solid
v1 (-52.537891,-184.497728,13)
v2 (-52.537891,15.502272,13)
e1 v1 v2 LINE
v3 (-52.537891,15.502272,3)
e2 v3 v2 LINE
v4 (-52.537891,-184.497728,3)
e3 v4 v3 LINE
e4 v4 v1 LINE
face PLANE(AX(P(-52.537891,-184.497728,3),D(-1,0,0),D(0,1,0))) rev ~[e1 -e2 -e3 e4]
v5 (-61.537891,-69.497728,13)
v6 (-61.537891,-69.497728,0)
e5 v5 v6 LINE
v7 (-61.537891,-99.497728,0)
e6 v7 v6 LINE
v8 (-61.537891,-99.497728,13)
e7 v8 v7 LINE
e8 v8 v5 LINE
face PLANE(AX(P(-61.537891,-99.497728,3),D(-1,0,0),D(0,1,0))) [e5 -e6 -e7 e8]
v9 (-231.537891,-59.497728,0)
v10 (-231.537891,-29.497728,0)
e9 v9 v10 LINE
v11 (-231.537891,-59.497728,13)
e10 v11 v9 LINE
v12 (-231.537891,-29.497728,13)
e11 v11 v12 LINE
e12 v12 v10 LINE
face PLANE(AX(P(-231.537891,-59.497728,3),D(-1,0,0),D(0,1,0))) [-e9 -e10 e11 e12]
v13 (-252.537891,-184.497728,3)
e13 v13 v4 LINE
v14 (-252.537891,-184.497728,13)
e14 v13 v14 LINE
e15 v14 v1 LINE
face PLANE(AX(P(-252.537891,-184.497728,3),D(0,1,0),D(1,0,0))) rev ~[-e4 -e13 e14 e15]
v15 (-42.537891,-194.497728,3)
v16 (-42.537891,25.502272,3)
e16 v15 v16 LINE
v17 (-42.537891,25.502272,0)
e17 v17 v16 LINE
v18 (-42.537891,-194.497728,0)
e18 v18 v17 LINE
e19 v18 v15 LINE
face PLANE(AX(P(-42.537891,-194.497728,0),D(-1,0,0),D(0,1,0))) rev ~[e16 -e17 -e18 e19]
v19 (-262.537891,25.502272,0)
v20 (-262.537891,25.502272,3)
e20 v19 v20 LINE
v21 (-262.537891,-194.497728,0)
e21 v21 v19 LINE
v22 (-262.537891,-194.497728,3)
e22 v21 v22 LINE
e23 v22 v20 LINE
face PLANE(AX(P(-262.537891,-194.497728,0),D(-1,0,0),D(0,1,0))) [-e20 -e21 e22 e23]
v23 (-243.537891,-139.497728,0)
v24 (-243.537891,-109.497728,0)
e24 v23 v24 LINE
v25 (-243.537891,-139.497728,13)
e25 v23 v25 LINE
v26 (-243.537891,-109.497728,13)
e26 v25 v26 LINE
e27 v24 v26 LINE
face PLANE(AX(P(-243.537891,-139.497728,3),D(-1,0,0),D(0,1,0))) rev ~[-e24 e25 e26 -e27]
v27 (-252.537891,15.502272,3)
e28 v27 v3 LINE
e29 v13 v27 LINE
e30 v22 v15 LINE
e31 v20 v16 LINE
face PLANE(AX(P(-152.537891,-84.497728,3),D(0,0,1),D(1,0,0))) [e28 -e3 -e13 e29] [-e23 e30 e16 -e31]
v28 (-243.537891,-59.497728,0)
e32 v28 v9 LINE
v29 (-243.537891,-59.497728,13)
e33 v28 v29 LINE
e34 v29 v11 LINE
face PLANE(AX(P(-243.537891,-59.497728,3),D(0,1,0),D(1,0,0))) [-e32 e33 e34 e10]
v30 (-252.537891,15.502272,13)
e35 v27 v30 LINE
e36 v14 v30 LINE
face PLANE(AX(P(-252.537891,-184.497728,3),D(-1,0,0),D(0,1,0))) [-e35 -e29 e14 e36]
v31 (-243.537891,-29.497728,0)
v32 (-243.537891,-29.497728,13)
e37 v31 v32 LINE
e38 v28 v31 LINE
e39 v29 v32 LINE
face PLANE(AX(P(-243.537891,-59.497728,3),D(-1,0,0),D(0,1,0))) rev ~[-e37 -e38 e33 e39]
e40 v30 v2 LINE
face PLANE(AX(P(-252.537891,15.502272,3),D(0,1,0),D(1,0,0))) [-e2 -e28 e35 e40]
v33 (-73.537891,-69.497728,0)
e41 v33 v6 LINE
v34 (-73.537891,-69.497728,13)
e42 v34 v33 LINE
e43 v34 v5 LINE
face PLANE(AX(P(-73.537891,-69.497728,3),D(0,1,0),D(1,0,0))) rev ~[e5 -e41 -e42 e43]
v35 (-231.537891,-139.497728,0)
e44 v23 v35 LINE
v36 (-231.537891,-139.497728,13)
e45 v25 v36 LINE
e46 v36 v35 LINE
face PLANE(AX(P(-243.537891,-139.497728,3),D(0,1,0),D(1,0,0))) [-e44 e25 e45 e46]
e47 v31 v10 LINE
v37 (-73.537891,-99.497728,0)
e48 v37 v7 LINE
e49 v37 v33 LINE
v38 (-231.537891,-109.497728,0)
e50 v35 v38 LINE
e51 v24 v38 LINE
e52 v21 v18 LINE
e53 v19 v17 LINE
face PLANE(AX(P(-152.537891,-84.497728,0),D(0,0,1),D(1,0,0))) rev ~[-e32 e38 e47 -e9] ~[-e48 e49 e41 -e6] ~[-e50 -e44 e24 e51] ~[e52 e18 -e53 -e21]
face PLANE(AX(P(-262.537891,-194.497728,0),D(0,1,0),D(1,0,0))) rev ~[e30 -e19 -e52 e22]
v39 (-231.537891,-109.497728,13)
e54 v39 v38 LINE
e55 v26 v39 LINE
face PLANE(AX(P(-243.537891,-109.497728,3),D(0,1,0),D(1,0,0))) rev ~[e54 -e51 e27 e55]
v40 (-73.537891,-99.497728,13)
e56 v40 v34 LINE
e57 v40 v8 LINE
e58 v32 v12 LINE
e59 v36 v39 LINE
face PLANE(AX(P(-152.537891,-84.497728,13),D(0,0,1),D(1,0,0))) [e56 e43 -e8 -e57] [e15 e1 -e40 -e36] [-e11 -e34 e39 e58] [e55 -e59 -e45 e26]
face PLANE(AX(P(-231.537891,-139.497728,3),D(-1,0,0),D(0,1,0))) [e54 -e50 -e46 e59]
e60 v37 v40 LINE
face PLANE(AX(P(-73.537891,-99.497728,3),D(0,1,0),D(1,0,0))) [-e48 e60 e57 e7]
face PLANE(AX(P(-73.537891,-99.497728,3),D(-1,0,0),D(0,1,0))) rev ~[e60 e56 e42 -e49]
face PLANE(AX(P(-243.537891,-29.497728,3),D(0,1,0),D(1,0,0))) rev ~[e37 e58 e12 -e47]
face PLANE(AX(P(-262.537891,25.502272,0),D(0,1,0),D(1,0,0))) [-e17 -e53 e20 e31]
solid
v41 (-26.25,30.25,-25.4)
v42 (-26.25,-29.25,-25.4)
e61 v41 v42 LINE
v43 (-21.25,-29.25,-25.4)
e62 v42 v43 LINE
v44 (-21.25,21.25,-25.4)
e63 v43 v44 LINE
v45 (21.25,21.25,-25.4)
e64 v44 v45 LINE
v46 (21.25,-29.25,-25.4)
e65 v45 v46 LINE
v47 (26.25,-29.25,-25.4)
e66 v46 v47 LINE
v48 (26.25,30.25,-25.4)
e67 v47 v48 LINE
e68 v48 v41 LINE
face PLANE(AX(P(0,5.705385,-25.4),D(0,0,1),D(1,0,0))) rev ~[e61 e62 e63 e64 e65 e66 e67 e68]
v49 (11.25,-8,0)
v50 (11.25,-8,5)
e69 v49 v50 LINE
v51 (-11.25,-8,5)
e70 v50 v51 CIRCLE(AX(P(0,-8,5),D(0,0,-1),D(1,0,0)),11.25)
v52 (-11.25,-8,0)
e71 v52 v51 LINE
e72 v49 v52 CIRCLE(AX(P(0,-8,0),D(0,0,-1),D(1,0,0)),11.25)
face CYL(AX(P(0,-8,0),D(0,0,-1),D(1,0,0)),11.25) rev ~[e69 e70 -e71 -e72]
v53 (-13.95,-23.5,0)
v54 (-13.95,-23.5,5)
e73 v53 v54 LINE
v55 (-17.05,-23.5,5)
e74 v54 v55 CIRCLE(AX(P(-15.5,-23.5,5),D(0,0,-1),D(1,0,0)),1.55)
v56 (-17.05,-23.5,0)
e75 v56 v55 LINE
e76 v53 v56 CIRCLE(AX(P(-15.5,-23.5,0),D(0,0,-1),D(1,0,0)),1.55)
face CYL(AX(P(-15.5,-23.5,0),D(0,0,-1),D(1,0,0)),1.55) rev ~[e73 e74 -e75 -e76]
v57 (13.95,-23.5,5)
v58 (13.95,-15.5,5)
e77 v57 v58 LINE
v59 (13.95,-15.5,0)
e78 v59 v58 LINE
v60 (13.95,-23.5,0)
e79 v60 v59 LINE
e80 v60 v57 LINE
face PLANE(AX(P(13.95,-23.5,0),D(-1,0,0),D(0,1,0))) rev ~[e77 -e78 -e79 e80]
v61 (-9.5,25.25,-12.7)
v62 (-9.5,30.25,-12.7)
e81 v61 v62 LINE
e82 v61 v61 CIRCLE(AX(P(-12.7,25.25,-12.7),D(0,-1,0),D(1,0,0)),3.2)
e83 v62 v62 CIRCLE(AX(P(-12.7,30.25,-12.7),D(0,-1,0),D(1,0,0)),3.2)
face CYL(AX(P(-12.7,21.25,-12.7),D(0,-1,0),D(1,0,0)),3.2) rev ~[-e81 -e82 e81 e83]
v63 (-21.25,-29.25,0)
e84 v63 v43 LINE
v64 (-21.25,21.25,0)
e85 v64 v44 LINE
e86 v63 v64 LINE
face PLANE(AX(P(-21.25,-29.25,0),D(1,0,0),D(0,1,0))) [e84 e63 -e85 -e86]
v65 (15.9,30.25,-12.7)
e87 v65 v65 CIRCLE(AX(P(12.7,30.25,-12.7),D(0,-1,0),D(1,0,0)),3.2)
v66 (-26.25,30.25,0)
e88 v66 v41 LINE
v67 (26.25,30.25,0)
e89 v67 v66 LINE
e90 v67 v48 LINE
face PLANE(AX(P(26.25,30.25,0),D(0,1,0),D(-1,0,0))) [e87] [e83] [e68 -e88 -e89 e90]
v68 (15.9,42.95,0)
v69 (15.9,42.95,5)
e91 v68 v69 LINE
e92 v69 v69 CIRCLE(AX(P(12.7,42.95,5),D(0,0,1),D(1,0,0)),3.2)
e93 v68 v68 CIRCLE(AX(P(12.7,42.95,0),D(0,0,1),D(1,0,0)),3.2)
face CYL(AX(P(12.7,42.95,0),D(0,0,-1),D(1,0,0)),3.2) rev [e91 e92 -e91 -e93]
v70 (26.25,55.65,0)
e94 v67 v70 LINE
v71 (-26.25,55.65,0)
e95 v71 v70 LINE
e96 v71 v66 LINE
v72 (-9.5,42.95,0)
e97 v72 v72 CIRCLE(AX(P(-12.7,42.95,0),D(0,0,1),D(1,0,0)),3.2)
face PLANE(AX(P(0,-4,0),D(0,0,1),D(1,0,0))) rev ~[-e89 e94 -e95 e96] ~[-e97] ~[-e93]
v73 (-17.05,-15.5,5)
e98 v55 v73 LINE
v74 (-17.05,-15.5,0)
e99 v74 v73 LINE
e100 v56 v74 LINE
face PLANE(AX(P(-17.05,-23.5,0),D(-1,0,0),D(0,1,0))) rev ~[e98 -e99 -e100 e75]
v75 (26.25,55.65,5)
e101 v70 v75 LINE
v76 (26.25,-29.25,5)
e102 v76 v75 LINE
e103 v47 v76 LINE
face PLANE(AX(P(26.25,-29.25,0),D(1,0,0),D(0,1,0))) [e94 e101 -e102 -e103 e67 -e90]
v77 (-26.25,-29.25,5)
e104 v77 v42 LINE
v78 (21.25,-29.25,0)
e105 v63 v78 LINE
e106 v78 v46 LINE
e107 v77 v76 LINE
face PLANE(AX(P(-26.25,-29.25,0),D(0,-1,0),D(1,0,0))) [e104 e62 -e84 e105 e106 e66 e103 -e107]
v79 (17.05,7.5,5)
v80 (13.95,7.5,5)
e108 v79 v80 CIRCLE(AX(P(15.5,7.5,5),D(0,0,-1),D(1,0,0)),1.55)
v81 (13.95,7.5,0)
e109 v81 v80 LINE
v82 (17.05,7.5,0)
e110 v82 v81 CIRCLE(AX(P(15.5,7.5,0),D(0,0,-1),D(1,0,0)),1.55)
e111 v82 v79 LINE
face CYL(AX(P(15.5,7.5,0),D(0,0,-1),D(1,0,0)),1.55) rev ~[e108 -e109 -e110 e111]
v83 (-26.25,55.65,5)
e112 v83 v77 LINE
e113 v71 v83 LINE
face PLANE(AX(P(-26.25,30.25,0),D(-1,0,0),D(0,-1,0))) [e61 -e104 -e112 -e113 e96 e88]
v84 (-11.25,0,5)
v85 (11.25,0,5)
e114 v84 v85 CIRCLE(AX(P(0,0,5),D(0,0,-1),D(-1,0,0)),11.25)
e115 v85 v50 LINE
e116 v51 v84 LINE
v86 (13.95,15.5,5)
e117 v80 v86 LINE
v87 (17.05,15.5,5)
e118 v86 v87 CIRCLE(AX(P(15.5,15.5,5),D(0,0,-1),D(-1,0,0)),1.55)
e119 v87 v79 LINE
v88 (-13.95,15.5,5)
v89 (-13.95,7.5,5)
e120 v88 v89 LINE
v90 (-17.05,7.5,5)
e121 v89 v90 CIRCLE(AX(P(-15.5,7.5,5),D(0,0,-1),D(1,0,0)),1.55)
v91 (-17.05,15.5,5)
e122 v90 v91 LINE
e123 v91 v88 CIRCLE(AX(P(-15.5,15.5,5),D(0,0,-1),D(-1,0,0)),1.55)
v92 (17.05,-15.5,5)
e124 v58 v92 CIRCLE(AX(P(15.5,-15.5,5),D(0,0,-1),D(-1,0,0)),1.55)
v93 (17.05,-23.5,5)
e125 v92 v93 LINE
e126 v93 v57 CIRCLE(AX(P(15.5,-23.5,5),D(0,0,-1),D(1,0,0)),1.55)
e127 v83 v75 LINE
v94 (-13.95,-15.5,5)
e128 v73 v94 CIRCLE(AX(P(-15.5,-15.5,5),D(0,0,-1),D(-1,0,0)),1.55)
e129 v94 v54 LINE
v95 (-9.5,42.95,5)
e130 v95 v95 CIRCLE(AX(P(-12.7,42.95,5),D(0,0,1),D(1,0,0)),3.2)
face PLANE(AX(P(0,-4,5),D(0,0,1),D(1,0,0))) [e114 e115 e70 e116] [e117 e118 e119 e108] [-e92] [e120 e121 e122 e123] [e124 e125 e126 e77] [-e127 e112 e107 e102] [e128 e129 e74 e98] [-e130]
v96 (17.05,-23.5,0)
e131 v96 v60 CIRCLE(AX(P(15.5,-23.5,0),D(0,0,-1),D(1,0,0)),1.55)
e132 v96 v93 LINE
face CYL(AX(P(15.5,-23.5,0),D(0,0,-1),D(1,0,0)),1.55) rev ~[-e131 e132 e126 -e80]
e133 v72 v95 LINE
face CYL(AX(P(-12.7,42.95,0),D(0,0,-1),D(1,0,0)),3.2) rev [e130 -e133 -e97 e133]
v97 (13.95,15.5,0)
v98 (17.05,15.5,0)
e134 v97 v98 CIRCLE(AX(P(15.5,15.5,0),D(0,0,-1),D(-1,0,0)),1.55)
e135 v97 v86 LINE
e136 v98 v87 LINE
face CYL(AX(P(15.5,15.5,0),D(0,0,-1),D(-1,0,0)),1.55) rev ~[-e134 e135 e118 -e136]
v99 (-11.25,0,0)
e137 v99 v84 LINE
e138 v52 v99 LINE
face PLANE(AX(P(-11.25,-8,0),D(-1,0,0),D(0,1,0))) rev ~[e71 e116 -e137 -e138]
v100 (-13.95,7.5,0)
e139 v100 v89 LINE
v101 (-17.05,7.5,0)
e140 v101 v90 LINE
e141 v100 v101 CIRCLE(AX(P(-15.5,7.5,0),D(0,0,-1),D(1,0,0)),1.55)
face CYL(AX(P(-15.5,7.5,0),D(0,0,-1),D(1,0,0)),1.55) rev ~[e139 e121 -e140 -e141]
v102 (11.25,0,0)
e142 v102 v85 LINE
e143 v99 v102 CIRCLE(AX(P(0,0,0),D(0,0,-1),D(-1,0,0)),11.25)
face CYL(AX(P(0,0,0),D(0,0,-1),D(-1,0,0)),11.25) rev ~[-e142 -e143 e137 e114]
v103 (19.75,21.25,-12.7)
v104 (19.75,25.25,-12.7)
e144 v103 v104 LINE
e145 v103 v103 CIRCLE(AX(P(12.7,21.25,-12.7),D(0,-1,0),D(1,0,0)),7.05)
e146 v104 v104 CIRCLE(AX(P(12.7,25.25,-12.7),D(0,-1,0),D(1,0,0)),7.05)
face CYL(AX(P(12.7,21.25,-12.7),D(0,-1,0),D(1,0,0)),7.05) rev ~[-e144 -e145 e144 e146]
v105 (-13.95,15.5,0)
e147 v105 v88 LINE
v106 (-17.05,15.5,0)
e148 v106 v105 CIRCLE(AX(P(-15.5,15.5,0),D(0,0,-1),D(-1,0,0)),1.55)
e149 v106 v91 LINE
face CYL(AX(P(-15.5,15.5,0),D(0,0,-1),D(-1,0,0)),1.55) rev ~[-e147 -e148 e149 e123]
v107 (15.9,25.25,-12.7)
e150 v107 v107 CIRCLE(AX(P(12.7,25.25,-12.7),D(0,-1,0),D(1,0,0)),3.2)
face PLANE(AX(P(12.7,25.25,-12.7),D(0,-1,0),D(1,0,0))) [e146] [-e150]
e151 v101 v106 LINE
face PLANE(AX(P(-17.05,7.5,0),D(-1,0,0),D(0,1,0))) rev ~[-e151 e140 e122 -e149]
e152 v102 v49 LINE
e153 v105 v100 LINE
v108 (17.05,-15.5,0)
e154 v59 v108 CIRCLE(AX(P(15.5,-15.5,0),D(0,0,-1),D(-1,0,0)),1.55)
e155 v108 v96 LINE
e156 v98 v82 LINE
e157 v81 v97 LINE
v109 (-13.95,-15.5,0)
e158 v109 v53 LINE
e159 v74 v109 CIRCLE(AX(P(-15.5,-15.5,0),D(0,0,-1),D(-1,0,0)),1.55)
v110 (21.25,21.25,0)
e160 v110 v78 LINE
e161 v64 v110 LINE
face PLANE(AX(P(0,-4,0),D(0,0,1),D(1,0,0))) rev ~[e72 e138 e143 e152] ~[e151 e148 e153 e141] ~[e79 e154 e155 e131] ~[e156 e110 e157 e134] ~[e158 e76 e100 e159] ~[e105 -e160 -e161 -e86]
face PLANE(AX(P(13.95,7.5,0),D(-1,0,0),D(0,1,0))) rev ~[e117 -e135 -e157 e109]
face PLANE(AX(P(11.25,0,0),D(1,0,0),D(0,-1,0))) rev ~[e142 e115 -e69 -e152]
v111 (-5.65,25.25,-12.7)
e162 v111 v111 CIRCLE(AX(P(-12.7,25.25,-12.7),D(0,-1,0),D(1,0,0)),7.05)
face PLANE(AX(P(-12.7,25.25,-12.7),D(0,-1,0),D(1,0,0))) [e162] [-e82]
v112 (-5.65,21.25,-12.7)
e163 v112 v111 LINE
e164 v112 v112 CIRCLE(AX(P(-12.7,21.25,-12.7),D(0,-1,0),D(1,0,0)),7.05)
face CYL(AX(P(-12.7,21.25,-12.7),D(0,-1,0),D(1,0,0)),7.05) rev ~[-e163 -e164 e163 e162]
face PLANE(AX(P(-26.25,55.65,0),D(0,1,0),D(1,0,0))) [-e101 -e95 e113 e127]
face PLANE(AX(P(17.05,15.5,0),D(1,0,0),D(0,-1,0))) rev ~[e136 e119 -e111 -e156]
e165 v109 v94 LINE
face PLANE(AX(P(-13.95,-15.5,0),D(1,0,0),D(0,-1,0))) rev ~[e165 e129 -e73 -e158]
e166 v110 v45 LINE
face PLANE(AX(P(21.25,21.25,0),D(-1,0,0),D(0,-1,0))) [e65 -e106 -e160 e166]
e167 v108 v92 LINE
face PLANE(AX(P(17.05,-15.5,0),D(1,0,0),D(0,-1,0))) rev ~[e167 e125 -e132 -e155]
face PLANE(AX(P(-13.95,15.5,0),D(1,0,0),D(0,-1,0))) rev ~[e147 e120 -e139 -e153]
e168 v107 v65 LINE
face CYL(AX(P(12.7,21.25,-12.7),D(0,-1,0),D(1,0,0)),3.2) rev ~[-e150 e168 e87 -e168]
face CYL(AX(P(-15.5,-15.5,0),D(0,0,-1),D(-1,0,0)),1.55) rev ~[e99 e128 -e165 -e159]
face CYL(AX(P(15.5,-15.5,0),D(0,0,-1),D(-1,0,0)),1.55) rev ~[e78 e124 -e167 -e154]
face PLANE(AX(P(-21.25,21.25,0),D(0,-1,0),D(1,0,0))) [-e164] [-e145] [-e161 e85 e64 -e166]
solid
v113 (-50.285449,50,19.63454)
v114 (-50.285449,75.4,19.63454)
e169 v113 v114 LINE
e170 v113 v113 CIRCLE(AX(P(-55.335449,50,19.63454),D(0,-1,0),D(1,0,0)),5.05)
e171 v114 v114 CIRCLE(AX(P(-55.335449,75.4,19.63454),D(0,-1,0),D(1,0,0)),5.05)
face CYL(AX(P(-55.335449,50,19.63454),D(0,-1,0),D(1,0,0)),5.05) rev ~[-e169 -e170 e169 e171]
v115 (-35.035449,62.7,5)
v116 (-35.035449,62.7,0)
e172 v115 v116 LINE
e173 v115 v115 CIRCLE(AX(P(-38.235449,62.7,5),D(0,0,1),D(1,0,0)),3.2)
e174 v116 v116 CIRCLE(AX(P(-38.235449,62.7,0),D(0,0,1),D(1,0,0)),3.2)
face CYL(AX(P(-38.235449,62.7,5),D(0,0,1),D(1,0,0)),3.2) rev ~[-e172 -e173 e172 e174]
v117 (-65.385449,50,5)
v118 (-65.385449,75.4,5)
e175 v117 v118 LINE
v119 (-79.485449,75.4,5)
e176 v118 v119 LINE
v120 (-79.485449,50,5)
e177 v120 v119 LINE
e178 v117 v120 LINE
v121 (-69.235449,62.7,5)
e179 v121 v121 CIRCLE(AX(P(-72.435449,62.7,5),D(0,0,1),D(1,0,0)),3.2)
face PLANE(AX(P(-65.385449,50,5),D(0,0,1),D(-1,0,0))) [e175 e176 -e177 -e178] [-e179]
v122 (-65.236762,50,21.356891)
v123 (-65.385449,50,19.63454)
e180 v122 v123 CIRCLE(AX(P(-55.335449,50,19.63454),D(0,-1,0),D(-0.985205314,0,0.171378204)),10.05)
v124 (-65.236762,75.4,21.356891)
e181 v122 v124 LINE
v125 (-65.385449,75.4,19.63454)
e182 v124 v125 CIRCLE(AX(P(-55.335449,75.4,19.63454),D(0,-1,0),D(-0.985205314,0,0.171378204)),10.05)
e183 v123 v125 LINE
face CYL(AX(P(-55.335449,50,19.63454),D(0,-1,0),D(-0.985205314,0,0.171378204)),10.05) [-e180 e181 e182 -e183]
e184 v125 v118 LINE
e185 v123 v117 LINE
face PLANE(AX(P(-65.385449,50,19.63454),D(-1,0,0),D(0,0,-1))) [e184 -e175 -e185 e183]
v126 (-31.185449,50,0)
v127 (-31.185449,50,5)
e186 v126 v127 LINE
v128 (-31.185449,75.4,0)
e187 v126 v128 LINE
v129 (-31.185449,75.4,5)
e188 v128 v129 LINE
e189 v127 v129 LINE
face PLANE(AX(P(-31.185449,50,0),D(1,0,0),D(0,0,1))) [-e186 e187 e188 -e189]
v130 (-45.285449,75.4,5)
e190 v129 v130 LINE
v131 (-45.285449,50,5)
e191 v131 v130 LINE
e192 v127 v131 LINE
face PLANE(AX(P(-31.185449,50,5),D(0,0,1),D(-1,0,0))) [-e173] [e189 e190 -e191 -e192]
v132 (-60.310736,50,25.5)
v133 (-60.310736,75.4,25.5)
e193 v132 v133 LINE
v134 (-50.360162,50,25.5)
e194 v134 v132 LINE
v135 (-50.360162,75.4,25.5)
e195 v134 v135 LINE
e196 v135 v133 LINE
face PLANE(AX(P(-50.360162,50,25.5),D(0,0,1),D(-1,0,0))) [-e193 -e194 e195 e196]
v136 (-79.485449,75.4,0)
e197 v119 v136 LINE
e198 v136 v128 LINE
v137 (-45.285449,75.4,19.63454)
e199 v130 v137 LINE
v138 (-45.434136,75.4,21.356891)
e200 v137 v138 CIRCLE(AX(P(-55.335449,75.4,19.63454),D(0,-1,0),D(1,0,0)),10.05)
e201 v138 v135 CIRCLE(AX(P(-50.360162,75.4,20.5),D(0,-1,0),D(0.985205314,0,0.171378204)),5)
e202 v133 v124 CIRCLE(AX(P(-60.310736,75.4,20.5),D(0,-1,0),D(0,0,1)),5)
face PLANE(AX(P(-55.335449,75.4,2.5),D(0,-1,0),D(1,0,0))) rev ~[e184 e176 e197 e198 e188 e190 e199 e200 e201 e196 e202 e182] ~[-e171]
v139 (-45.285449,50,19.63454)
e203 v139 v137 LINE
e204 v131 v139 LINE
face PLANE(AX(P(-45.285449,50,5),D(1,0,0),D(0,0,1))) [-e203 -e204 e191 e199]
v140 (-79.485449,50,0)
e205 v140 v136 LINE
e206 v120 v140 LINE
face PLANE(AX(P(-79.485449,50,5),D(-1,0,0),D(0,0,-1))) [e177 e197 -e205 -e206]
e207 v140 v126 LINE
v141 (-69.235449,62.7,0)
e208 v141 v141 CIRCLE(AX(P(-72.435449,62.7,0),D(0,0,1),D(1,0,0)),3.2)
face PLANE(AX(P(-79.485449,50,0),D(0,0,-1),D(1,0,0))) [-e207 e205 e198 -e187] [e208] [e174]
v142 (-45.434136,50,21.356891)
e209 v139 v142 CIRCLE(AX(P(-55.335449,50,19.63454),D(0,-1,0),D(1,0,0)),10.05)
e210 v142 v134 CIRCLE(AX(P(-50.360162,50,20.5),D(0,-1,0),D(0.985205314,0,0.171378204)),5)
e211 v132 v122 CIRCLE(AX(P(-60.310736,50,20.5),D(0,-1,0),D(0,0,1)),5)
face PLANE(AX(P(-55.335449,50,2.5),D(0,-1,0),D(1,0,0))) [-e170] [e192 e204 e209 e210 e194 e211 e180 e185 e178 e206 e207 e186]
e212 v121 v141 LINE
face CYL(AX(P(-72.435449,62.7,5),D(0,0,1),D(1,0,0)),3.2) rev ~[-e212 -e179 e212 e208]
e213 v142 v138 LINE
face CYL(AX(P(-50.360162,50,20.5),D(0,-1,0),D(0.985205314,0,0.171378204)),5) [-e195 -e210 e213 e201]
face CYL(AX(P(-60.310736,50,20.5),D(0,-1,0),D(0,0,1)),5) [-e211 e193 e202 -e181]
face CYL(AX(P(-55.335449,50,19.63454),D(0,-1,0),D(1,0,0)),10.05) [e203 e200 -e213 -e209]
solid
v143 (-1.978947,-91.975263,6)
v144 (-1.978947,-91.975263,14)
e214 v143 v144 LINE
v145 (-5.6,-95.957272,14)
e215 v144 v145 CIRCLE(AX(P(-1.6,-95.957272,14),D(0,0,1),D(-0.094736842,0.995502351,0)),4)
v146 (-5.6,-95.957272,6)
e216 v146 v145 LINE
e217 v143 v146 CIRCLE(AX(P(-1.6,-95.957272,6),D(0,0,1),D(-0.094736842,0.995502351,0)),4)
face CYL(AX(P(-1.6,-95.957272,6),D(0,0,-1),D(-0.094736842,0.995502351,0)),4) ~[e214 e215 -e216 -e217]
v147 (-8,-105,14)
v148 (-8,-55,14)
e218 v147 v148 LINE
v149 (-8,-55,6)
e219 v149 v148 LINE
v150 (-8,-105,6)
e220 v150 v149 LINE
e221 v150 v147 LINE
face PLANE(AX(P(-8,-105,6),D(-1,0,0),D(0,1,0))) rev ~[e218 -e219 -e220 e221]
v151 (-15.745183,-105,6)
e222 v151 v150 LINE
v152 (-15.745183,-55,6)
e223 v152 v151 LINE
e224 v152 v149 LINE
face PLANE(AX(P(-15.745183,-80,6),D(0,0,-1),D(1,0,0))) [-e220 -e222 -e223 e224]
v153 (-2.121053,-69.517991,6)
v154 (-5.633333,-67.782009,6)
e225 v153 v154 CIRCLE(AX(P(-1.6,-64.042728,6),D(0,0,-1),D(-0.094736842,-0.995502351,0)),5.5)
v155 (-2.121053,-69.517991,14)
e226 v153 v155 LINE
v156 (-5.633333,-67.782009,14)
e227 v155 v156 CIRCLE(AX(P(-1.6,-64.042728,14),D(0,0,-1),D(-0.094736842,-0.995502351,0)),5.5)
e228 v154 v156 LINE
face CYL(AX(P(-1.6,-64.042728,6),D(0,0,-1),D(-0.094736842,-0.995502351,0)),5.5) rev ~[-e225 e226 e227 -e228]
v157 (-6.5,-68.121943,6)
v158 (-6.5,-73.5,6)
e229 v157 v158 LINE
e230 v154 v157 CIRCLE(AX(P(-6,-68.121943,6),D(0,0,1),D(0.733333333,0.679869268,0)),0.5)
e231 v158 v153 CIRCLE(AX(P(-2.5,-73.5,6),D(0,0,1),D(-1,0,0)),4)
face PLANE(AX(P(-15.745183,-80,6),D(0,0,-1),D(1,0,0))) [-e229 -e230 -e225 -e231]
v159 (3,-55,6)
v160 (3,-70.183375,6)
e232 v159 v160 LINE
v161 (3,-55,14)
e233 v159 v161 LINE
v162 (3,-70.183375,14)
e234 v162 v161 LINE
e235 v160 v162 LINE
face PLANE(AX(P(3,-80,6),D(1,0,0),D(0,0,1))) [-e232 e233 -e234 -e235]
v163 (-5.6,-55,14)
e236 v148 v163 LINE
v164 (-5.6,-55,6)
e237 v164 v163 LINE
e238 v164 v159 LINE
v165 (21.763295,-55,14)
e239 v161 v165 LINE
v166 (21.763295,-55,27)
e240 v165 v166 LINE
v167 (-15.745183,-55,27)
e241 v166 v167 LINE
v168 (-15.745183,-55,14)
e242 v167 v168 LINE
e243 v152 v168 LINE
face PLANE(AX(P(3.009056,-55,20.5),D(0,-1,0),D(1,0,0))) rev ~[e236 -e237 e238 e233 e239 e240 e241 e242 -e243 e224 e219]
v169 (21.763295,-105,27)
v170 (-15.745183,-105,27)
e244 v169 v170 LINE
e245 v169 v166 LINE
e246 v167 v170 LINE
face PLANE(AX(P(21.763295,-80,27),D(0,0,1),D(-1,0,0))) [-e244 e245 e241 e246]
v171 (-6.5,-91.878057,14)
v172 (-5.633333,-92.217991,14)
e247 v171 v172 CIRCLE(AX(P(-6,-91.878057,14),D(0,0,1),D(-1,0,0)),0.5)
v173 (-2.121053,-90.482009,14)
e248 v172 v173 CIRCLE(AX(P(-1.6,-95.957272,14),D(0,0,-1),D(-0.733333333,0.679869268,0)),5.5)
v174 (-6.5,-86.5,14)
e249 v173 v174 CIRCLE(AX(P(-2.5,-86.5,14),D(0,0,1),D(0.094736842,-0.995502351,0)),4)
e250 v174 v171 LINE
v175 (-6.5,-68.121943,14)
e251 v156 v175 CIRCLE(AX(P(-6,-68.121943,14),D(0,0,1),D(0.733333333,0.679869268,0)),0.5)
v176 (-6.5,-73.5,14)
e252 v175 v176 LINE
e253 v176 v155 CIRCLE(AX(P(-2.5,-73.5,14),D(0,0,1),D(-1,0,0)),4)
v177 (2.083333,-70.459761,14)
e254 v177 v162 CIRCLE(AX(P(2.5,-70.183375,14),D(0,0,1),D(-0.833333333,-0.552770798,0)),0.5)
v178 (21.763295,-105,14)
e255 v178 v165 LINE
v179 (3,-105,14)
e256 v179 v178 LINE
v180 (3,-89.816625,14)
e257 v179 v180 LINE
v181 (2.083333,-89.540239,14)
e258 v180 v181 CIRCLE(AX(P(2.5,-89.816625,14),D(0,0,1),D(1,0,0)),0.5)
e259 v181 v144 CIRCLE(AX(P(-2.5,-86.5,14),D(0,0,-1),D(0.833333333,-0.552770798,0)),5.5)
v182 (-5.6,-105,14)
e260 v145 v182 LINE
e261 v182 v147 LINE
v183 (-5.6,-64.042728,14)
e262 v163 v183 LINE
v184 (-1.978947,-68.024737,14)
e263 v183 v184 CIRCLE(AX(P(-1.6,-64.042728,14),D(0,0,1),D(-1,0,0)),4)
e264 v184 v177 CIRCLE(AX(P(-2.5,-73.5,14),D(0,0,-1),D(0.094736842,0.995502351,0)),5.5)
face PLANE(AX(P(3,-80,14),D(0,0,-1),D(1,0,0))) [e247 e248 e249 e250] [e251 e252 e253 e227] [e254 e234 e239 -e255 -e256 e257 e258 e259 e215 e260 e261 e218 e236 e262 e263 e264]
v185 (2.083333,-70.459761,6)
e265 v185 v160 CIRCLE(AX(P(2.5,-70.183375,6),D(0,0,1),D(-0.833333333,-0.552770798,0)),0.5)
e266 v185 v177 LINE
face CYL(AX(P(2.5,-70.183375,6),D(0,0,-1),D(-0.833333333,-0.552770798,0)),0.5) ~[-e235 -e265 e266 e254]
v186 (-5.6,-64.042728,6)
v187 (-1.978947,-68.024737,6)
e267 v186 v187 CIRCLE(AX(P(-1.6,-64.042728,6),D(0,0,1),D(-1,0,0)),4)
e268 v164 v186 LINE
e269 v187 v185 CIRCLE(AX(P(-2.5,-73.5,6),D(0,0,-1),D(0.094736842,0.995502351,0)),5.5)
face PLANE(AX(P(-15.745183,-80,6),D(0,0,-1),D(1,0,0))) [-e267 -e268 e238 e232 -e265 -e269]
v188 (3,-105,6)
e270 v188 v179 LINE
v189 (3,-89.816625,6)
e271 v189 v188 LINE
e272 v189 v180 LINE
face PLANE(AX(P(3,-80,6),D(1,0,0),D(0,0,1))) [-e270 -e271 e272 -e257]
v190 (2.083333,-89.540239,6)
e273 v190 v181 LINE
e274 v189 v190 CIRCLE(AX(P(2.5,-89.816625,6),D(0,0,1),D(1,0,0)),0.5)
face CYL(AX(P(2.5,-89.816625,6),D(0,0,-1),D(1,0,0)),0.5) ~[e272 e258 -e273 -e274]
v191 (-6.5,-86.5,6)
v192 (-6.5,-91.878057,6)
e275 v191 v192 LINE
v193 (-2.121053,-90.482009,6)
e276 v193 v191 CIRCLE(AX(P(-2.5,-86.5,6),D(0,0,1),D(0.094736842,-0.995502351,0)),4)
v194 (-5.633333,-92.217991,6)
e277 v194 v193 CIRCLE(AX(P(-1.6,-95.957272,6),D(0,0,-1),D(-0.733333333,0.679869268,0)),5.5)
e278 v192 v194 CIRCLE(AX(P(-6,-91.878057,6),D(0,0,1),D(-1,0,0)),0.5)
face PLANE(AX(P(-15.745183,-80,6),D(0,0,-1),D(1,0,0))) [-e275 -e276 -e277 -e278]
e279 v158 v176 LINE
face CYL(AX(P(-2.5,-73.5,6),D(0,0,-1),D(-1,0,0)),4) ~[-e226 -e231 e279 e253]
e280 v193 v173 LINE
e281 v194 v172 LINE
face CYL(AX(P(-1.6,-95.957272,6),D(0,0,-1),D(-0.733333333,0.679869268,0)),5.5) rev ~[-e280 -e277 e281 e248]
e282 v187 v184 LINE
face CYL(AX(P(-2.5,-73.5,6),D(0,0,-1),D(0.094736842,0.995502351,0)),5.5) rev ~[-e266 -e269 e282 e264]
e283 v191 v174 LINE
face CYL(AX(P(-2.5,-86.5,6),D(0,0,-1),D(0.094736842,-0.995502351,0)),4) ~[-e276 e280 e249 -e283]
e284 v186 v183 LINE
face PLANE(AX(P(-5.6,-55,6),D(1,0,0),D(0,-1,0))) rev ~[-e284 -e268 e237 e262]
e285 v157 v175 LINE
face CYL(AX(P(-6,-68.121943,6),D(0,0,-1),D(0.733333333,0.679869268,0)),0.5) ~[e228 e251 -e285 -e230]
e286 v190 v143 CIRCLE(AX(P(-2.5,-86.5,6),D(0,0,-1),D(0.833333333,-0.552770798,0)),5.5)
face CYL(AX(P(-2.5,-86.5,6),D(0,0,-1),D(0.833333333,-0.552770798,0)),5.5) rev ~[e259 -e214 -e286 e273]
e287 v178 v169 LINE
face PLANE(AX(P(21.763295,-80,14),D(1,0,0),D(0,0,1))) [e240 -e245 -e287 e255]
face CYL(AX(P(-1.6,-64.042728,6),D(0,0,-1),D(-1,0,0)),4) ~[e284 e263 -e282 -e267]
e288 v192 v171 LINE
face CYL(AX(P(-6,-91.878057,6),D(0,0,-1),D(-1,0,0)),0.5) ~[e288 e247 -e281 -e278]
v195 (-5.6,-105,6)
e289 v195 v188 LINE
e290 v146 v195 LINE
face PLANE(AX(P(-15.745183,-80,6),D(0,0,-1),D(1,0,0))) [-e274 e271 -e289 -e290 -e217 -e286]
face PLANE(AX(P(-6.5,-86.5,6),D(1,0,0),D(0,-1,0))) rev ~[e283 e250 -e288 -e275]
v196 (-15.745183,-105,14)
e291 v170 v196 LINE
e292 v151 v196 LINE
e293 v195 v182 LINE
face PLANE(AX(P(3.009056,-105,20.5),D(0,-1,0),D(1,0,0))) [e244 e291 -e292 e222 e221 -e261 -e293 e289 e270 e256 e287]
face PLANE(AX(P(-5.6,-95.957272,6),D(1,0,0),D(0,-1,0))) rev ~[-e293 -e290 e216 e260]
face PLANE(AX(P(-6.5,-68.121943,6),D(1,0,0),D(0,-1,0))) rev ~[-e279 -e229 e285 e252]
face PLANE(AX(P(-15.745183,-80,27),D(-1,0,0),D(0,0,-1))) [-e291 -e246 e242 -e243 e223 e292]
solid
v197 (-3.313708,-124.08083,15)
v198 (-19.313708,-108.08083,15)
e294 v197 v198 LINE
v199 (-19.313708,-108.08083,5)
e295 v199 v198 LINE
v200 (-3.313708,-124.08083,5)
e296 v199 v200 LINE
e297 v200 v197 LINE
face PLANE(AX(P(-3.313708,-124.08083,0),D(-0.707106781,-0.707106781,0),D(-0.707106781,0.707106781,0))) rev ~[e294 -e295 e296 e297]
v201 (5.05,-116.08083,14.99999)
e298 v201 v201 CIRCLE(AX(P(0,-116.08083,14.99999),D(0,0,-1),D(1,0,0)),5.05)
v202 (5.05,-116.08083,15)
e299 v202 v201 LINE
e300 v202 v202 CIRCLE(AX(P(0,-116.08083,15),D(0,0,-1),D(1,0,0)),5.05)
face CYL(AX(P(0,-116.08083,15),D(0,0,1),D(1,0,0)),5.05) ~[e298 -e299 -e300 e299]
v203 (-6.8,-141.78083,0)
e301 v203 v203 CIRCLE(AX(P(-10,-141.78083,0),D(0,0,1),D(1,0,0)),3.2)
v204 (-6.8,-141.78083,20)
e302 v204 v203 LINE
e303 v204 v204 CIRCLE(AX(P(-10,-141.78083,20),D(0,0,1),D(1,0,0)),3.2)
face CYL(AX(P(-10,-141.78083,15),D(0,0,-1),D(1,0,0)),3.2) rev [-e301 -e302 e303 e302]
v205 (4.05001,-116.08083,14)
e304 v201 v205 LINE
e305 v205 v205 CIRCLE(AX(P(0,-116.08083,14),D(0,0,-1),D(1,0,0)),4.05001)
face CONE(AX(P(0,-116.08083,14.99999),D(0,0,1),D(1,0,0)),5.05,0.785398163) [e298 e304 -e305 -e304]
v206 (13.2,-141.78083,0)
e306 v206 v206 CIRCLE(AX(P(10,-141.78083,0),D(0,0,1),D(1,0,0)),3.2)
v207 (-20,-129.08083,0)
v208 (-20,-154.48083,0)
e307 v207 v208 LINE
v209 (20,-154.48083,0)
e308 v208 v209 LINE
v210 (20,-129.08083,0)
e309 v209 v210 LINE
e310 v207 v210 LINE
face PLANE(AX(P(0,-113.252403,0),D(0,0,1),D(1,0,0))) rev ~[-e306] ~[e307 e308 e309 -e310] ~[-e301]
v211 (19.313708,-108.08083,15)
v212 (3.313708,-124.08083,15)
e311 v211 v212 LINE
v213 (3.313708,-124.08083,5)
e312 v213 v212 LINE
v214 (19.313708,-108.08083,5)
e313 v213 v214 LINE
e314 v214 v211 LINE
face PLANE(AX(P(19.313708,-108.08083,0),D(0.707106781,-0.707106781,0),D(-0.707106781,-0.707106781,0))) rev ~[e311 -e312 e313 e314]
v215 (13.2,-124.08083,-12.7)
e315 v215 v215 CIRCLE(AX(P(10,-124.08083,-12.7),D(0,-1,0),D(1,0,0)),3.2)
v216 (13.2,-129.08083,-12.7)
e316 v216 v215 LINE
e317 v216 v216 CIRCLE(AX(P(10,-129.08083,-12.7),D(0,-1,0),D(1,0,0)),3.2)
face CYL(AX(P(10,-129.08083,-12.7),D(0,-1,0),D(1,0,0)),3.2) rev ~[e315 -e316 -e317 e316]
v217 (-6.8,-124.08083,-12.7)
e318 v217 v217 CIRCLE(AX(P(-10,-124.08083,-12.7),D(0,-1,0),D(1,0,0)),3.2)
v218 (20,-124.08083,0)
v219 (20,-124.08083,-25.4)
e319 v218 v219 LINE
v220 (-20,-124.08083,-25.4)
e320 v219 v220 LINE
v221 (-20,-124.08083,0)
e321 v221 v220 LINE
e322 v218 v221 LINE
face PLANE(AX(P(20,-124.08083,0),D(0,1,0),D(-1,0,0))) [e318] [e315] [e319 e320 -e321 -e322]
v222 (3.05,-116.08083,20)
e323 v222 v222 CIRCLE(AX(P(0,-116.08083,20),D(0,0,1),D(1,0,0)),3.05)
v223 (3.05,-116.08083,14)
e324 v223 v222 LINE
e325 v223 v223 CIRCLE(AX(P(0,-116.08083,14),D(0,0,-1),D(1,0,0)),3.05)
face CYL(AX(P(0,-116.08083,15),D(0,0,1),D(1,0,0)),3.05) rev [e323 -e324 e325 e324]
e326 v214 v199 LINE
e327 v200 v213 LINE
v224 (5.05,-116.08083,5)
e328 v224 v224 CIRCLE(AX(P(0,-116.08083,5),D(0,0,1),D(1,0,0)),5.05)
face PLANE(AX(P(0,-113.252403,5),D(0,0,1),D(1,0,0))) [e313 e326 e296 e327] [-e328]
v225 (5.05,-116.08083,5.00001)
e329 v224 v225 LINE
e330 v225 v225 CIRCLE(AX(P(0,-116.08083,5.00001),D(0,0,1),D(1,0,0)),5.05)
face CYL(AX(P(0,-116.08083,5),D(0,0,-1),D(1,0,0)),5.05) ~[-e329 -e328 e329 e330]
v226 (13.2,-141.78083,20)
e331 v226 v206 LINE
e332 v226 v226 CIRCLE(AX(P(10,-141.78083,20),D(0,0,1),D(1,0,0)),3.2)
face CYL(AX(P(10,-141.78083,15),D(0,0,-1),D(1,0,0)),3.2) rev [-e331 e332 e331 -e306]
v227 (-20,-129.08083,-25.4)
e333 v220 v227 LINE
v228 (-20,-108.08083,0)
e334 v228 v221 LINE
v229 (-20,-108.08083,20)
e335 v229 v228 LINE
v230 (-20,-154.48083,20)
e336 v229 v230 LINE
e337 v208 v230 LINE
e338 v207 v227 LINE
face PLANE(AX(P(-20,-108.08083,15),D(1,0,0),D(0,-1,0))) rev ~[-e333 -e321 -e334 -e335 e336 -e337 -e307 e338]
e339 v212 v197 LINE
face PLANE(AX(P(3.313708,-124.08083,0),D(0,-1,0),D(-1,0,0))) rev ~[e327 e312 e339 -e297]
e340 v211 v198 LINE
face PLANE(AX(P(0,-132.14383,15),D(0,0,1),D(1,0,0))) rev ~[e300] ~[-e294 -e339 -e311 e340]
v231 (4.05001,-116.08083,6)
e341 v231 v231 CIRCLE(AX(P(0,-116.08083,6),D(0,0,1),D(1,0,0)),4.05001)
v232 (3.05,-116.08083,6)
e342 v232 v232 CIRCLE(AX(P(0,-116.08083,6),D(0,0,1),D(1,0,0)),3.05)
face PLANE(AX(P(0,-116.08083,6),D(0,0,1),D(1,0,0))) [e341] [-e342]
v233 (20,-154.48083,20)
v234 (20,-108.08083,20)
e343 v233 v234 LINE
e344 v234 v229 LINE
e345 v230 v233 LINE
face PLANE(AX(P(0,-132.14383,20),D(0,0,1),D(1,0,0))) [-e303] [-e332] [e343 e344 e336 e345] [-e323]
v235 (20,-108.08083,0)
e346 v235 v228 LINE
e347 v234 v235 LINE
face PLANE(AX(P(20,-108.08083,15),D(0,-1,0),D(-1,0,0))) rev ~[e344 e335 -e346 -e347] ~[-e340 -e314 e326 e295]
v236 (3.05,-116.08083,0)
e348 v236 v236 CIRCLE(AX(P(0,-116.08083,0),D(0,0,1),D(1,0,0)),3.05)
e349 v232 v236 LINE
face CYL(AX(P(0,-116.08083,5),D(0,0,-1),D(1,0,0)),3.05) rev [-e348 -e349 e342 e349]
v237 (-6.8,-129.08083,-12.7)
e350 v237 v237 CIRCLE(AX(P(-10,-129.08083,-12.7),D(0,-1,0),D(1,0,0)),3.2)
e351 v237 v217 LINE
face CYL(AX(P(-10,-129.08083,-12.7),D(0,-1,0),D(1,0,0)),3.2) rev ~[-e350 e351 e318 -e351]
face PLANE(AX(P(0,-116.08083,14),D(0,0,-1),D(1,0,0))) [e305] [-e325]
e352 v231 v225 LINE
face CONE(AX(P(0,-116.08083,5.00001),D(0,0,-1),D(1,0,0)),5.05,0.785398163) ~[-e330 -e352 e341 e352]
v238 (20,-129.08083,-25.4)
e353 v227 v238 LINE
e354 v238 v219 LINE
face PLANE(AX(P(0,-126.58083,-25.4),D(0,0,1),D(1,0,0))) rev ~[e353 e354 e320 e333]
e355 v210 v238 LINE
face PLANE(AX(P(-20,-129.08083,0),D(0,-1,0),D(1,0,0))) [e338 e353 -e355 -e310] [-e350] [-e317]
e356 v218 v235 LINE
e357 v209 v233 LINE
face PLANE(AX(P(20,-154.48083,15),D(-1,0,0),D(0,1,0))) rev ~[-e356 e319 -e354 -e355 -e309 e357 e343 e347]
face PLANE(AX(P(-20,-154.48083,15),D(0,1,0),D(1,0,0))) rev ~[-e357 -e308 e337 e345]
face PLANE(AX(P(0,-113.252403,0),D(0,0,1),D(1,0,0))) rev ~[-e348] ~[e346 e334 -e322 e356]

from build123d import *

# Parameters (mm, degrees)
F2_R      = 5.05
F3_DEPTH  = 25.4
F4_R      = 3.2
F5_DEPTH  = 5
F6_W      = 42.5
F6_H      = 50.5
F6_W_2    = 52.5
F6_H_2    = 25.4
F6_R      = 3.2
F7_DEPTH  = 5
F8_DEPTH  = 25.4
F9_R      = 3.2
F10_DEPTH = 9
F9_R_2    = 7.05
F11_DEPTH = 4
F12_W     = 40
F12_H     = 25.4
F12_R     = 3.2
F13_DEPTH = 15
F12_R_2   = 3.05
F14_DEPTH = 5
F15_R     = 3.2
F15_R_2   = 3.05
F16_DEPTH = 5
F17_DEPTH = 25.4
F18_R     = 3.2
F19_DEPTH = 5
F20_R     = 5.05
F20_R_2   = 3.05
F22_DEPTH = 1
F21_R     = 5.05
F21_R_2   = 3.05
F23_DEPTH = 1
F24_SIZE  = 0.99999
F26_W     = 18.7451829227
F26_H     = 8
F27_DEPTH = 25
F29_DEPTH = 8
F30_W     = 220
F30_H     = 220
F30_W_2   = 12
F30_H_2   = 30
F31_DEPTH = 3
F34_W     = 200
F34_H     = 200
F34_W_2   = 12
F34_H_2   = 30
F35_DEPTH = 10


# Not quite as in the source:
# - a fillet or chamfer is up to 0.001 mm smaller than in the source, because OpenCascade refuses the exact size
# - a feature names something its author has since deleted; it is built from what else it names


with BuildPart() as f3:
    # F2 (on offset) → F3 (new body)
    with BuildSketch(Plane.XZ.offset(-50)):
        Polygon((-65.3854490548, 5), (-79.4854490548, 5), (-79.4854490548, 0), (-31.1854490548, 0), (-31.1854490548, 5), (-45.2854490548, 5), align=None)
        with BuildLine():
            Line((-65.3854490548, 19.6345400687), (-65.3854490548, 5))
            Line((-65.3854490548, 5), (-45.2854490548, 5))
            Line((-45.2854490548, 5), (-45.2854490548, 19.6345400687))
            ThreePointArc((-45.2854490548, 19.6345400687), (-55.3354490548, 9.5845400687), (-65.3854490548, 19.6345400687))
        make_face()
        with BuildLine():
            ThreePointArc((-65.2367624625, 21.3568910211), (-65.3482084085, 20.4989185312), (-65.3854490548, 19.6345400687))
            ThreePointArc((-65.3854490548, 19.6345400687), (-55.3354490548, 9.5845400687), (-45.2854490548, 19.6345400687))
            ThreePointArc((-45.2854490548, 19.6345400687), (-45.3226897012, 20.4989185312), (-45.4341356472, 21.3568910211))
            ThreePointArc((-45.4341356472, 21.3568910211), (-47.1418128824, 24.326516373), (-50.3601622182, 25.5))
            Line((-50.3601622182, 25.5), (-60.3107358915, 25.5))
            ThreePointArc((-60.3107358915, 25.5), (-63.5290852273, 24.326516373), (-65.2367624625, 21.3568910211))
        make_face()
        with Locations((-55.3354490548, 19.6345400687)):
            Circle(F2_R, mode=Mode.SUBTRACT)
    extrude(amount=-F3_DEPTH)

    # F4 (on face) → F5 (cut, through all)
    with BuildSketch(Plane.XY.offset(5)):
        with Locations((-72.4354490548, 62.7)):
            Circle(F4_R)
        with Locations((-38.2354490548, 62.7)):
            Circle(F4_R)
    extrude(amount=-F5_DEPTH, mode=Mode.SUBTRACT)


with BuildPart() as f7:
    # F6 (on Top) → F7 (new body)
    with BuildSketch(Plane.XY):
        with Locations((0, -4)):
            Rectangle(F6_W, F6_H)
        with BuildLine():
            Line((-17.05, -23.5), (-17.05, -15.5))
            ThreePointArc((-17.05, -15.5), (-15.5, -13.95), (-13.95, -15.5))
            Line((-13.95, -15.5), (-13.95, -23.5))
            ThreePointArc((-13.95, -23.5), (-15.5, -25.05), (-17.05, -23.5))
        make_face(mode=Mode.SUBTRACT)
        with BuildLine():
            Line((-17.05, 7.5), (-17.05, 15.5))
            ThreePointArc((-17.05, 15.5), (-15.5, 17.05), (-13.95, 15.5))
            Line((-13.95, 15.5), (-13.95, 7.5))
            ThreePointArc((-13.95, 7.5), (-15.5, 5.95), (-17.05, 7.5))
        make_face(mode=Mode.SUBTRACT)
        with BuildLine():
            Line((13.95, -23.5), (13.95, -15.5))
            ThreePointArc((13.95, -15.5), (15.5, -13.95), (17.05, -15.5))
            Line((17.05, -15.5), (17.05, -23.5))
            ThreePointArc((17.05, -23.5), (15.5, -25.05), (13.95, -23.5))
        make_face(mode=Mode.SUBTRACT)
        with BuildLine():
            Line((-11.25, -8), (-11.25, 0))
            ThreePointArc((-11.25, 0), (0, 11.25), (11.25, 0))
            Line((11.25, 0), (11.25, -8))
            ThreePointArc((11.25, -8), (0, -19.25), (-11.25, -8))
        make_face(mode=Mode.SUBTRACT)
        with BuildLine():
            Line((13.95, 7.5), (13.95, 15.5))
            ThreePointArc((13.95, 15.5), (15.5, 17.05), (17.05, 15.5))
            Line((17.05, 15.5), (17.05, 7.5))
            ThreePointArc((17.05, 7.5), (15.5, 5.95), (13.95, 7.5))
        make_face(mode=Mode.SUBTRACT)
        Polygon((-21.25, 21.25), (21.25, 21.25), (21.25, -29.25), (26.25, -29.25), (26.25, 30.25), (-26.25, 30.25), (-26.25, -29.25), (-21.25, -29.25), align=None)
        with Locations((0, 42.95)):
            Rectangle(F6_W_2, F6_H_2)
        with Locations((-12.7, 42.95)):
            Circle(F6_R, mode=Mode.SUBTRACT)
        with Locations((12.7, 42.95)):
            Circle(F6_R, mode=Mode.SUBTRACT)
    extrude(amount=F7_DEPTH)

    # F6 (on Top) → F8 (join)
    with BuildSketch(Plane.XY):
        Polygon((-21.25, 21.25), (21.25, 21.25), (21.25, -29.25), (26.25, -29.25), (26.25, 30.25), (-26.25, 30.25), (-26.25, -29.25), (-21.25, -29.25), align=None)
    extrude(amount=-F8_DEPTH)

    # F9 (on face) → F10 (cut, through all)
    with BuildSketch(Plane.XZ.offset(-21.25)):
        with Locations((-12.7, -12.7)):
            Circle(F9_R)
        with Locations((12.7, -12.7)):
            Circle(F9_R)
    extrude(amount=-F10_DEPTH, mode=Mode.SUBTRACT)

    # F9 (on face) → F11 (cut)
    with BuildSketch(Plane.XZ.offset(-21.25)):
        with Locations((-12.7, -12.7)):
            Circle(F9_R_2)
        with Locations((-12.7, -12.7)):
            Circle(F9_R, mode=Mode.SUBTRACT)
        with Locations((12.7, -12.7)):
            Circle(F9_R_2)
        with Locations((12.7, -12.7)):
            Circle(F9_R, mode=Mode.SUBTRACT)
    extrude(amount=-F11_DEPTH, mode=Mode.SUBTRACT)


with BuildPart() as f13:
    # F12 (on Top) → F13 (new body)
    with BuildSketch(Plane.XY):
        Polygon((-3.313708499, -124.0808303208), (-20, -124.0808303208), (-20, -129.0808303208), (20, -129.0808303208), (20, -124.0808303208), (3.313708499, -124.0808303208), align=None)
        with Locations((0, -141.7808303208)):
            Rectangle(F12_W, F12_H)
        with Locations((-10, -141.7808303208)):
            Circle(F12_R, mode=Mode.SUBTRACT)
        with Locations((10, -141.7808303208)):
            Circle(F12_R, mode=Mode.SUBTRACT)
        Polygon((-20, -108.0808303208), (-20, -124.0808303208), (-3.313708499, -124.0808303208), (-19.313708499, -108.0808303208), align=None)
        Polygon((19.313708499, -108.0808303208), (3.313708499, -124.0808303208), (20, -124.0808303208), (20, -108.0808303208), align=None)
    extrude(amount=F13_DEPTH)

    # F12 (on Top) → F14 (join)
    with BuildSketch(Plane.XY):
        Polygon((-19.313708499, -108.0808303208), (-3.313708499, -124.0808303208), (3.313708499, -124.0808303208), (19.313708499, -108.0808303208), align=None)
        Polygon((0, -110.3073276289), (5, -113.1940789749), (5, -118.9675816668), (0, -121.8543330127), (-5, -118.9675816668), (-5, -113.1940789749), align=None, mode=Mode.SUBTRACT)
        Polygon((5, -118.9675816668), (5, -113.1940789749), (0, -110.3073276289), (-5, -113.1940789749), (-5, -118.9675816668), (0, -121.8543330127), align=None)
        with Locations((0, -116.0808303208)):
            Circle(F12_R_2, mode=Mode.SUBTRACT)
    extrude(amount=F14_DEPTH)

    # F15 (on face) → F16 (join)
    with BuildSketch(Plane.XY.offset(15)):
        Polygon((-20, -108.0808303208), (-20, -154.4808303208), (20, -154.4808303208), (20, -108.0808303208), (19.313708499, -108.0808303208), (3.313708499, -124.0808303208), (-3.313708499, -124.0808303208), (-19.313708499, -108.0808303208), align=None)
        with Locations((-10, -141.7808303208)):
            Circle(F15_R, mode=Mode.SUBTRACT)
        with Locations((10, -141.7808303208)):
            Circle(F15_R, mode=Mode.SUBTRACT)
        Polygon((19.313708499, -108.0808303208), (-19.313708499, -108.0808303208), (-3.313708499, -124.0808303208), (3.313708499, -124.0808303208), align=None)
        with Locations((0, -116.0808303208)):
            Circle(F15_R_2, mode=Mode.SUBTRACT)
    extrude(amount=F16_DEPTH)

    # F12 (on Top) → F17 (join)
    with BuildSketch(Plane.XY):
        Polygon((-3.313708499, -124.0808303208), (-20, -124.0808303208), (-20, -129.0808303208), (20, -129.0808303208), (20, -124.0808303208), (3.313708499, -124.0808303208), align=None)
    extrude(amount=-F17_DEPTH)

    # F18 (on face) → F19 (cut, through all)
    with BuildSketch(Plane.XZ.offset(129.0808303208)):
        with Locations((-10, -12.7)):
            Circle(F18_R)
        with Locations((10, -12.7)):
            Circle(F18_R)
    extrude(amount=-F19_DEPTH, mode=Mode.SUBTRACT)

    # F20 (on face) → F22 (join)
    with BuildSketch(Plane.XY.offset(5)):
        with Locations((0, -116.0808303208)):
            Circle(F20_R)
        with Locations((0, -116.0808303208)):
            Circle(F20_R_2, mode=Mode.SUBTRACT)
    extrude(amount=F22_DEPTH)

    # F21 (on face) → F23 (join)
    with BuildSketch(Plane(origin=(0, 0, 15), x_dir=(1, 0, 0), z_dir=(0, 0, -1))):
        with Locations((0, 116.0808303208)):
            Circle(F21_R)
        with Locations((0, 116.0808303208)):
            Circle(F21_R_2, mode=Mode.SUBTRACT)
    extrude(amount=F23_DEPTH)

    # F24 (size 1 in the source; OpenCascade refuses exactly that, so slightly less here)
    f24_edges = [f13.edges().sort_by_distance(p)[0] for p in [
        (-5.05, -116.08083, 6),
        (-5.05, -116.08083, 14),
    ]]
    chamfer(f24_edges, length=F24_SIZE)


with BuildPart() as f27:
    # F26 (on offset) → F27 (new body, symmetric)
    with BuildSketch(Plane.XZ.offset(80)):
        Polygon((21.7632954655, 27), (-15.7451829227, 27), (-15.7451829227, 14), (3, 14), (21.7632954655, 14), align=None)
        with Locations((-6.3725914613, 10)):
            Rectangle(F26_W, F26_H)
    extrude(amount=F27_DEPTH, both=True)

    # F28 (on face) → F29 (cut, through all)
    with BuildSketch(Plane(origin=(0, 0, 6), x_dir=(1, 0, 0), z_dir=(0, 0, -1))):
        with BuildLine():
            Line((-5.6, 105), (-8, 105))
            Line((-8, 105), (-8, 86.5))
            ThreePointArc((-8, 86.5), (-2.5, 81), (3, 86.5))
            Line((3, 86.5), (3, 89.8166247904))
            ThreePointArc((3, 89.8166247904), (2.6443375673, 89.3379112365), (2.0833333333, 89.5402393912))
            ThreePointArc((2.0833333333, 89.5402393912), (0.3277241606, 91.2174120099), (-1.9789473684, 91.9752629302))
            ThreePointArc((-1.9789473684, 91.9752629302), (-4.5593740448, 93.2661563456), (-5.6, 95.957272334))
            Line((-5.6, 95.957272334), (-5.6, 105))
        make_face()
        with BuildLine():
            Line((-6.5, 86.5), (-6.5, 91.8780567232))
            ThreePointArc((-6.5, 91.8780567232), (-6.1825741858, 92.3435313913), (-5.6333333333, 92.2179913574))
            ThreePointArc((-5.6333333333, 92.2179913574), (-4.0370096871, 91.0266553559), (-2.1210526316, 90.4820094038))
            ThreePointArc((-2.1210526316, 90.4820094038), (0.1911159884, 83.5406259552), (-6.5, 86.5))
        make_face(mode=Mode.SUBTRACT)
        with BuildLine():
            ThreePointArc((3, 86.5), (-2.5, 81), (-8, 86.5))
            Line((-8, 86.5), (-8, 73.5))
            ThreePointArc((-8, 73.5), (-2.5, 79), (3, 73.5))
            Line((3, 73.5), (3, 86.5))
        make_face()
        with BuildLine():
            ThreePointArc((3, 73.5), (-2.5, 79), (-8, 73.5))
            Line((-8, 73.5), (-8, 55))
            Line((-8, 55), (-5.6, 55))
            Line((-5.6, 55), (-5.6, 64.042727666))
            ThreePointArc((-5.6, 64.042727666), (-4.5593740448, 66.7338436544), (-1.9789473684, 68.0247370698))
            ThreePointArc((-1.9789473684, 68.0247370698), (0.3277241606, 68.7825879901), (2.0833333333, 70.4597606088))
            ThreePointArc((2.0833333333, 70.4597606088), (2.6443375673, 70.6620887635), (3, 70.1833752096))
            Line((3, 70.1833752096), (3, 73.5))
        make_face()
        with BuildLine():
            Line((-6.5, 68.1219432768), (-6.5, 73.5))
            ThreePointArc((-6.5, 73.5), (0.1911159884, 76.4593740448), (-2.1210526316, 69.5179905962))
            ThreePointArc((-2.1210526316, 69.5179905962), (-4.0370096871, 68.9733446441), (-5.6333333333, 67.7820086426))
            ThreePointArc((-5.6333333333, 67.7820086426), (-6.1825741858, 67.6564686087), (-6.5, 68.1219432768))
        make_face(mode=Mode.SUBTRACT)
    extrude(amount=-F29_DEPTH, mode=Mode.SUBTRACT)


with BuildPart() as f31:
    # F30 (on Top) → F31 (new body)
    with BuildSketch(Plane.XY):
        with Locations((-152.5378906727, -84.4977283539)):
            Rectangle(F30_W, F30_H)
        with Locations((-237.5378906727, -124.4977283539)):
            Rectangle(F30_W_2, F30_H_2, mode=Mode.SUBTRACT)
        with Locations((-237.5378906727, -44.4977283539)):
            Rectangle(F30_W_2, F30_H_2, mode=Mode.SUBTRACT)
        with Locations((-67.5378906727, -84.4977283539)):
            Rectangle(F30_W_2, F30_H_2, mode=Mode.SUBTRACT)
    extrude(amount=F31_DEPTH)

    # F34 (on face) → F35 (join)
    with BuildSketch(Plane.XY.offset(3)):
        with Locations((-152.5378906727, -84.4977283539)):
            Rectangle(F34_W, F34_H)
        with Locations((-237.5378906727, -124.4977283539)):
            Rectangle(F34_W_2, F34_H_2, mode=Mode.SUBTRACT)
        with Locations((-237.5378906727, -44.4977283539)):
            Rectangle(F34_W_2, F34_H_2, mode=Mode.SUBTRACT)
        with Locations((-67.5378906727, -84.4977283539)):
            Rectangle(F34_W_2, F34_H_2, mode=Mode.SUBTRACT)
    extrude(amount=F35_DEPTH)


solid = Compound([f3.part, f7.part, f13.part, f27.part, f31.part])
